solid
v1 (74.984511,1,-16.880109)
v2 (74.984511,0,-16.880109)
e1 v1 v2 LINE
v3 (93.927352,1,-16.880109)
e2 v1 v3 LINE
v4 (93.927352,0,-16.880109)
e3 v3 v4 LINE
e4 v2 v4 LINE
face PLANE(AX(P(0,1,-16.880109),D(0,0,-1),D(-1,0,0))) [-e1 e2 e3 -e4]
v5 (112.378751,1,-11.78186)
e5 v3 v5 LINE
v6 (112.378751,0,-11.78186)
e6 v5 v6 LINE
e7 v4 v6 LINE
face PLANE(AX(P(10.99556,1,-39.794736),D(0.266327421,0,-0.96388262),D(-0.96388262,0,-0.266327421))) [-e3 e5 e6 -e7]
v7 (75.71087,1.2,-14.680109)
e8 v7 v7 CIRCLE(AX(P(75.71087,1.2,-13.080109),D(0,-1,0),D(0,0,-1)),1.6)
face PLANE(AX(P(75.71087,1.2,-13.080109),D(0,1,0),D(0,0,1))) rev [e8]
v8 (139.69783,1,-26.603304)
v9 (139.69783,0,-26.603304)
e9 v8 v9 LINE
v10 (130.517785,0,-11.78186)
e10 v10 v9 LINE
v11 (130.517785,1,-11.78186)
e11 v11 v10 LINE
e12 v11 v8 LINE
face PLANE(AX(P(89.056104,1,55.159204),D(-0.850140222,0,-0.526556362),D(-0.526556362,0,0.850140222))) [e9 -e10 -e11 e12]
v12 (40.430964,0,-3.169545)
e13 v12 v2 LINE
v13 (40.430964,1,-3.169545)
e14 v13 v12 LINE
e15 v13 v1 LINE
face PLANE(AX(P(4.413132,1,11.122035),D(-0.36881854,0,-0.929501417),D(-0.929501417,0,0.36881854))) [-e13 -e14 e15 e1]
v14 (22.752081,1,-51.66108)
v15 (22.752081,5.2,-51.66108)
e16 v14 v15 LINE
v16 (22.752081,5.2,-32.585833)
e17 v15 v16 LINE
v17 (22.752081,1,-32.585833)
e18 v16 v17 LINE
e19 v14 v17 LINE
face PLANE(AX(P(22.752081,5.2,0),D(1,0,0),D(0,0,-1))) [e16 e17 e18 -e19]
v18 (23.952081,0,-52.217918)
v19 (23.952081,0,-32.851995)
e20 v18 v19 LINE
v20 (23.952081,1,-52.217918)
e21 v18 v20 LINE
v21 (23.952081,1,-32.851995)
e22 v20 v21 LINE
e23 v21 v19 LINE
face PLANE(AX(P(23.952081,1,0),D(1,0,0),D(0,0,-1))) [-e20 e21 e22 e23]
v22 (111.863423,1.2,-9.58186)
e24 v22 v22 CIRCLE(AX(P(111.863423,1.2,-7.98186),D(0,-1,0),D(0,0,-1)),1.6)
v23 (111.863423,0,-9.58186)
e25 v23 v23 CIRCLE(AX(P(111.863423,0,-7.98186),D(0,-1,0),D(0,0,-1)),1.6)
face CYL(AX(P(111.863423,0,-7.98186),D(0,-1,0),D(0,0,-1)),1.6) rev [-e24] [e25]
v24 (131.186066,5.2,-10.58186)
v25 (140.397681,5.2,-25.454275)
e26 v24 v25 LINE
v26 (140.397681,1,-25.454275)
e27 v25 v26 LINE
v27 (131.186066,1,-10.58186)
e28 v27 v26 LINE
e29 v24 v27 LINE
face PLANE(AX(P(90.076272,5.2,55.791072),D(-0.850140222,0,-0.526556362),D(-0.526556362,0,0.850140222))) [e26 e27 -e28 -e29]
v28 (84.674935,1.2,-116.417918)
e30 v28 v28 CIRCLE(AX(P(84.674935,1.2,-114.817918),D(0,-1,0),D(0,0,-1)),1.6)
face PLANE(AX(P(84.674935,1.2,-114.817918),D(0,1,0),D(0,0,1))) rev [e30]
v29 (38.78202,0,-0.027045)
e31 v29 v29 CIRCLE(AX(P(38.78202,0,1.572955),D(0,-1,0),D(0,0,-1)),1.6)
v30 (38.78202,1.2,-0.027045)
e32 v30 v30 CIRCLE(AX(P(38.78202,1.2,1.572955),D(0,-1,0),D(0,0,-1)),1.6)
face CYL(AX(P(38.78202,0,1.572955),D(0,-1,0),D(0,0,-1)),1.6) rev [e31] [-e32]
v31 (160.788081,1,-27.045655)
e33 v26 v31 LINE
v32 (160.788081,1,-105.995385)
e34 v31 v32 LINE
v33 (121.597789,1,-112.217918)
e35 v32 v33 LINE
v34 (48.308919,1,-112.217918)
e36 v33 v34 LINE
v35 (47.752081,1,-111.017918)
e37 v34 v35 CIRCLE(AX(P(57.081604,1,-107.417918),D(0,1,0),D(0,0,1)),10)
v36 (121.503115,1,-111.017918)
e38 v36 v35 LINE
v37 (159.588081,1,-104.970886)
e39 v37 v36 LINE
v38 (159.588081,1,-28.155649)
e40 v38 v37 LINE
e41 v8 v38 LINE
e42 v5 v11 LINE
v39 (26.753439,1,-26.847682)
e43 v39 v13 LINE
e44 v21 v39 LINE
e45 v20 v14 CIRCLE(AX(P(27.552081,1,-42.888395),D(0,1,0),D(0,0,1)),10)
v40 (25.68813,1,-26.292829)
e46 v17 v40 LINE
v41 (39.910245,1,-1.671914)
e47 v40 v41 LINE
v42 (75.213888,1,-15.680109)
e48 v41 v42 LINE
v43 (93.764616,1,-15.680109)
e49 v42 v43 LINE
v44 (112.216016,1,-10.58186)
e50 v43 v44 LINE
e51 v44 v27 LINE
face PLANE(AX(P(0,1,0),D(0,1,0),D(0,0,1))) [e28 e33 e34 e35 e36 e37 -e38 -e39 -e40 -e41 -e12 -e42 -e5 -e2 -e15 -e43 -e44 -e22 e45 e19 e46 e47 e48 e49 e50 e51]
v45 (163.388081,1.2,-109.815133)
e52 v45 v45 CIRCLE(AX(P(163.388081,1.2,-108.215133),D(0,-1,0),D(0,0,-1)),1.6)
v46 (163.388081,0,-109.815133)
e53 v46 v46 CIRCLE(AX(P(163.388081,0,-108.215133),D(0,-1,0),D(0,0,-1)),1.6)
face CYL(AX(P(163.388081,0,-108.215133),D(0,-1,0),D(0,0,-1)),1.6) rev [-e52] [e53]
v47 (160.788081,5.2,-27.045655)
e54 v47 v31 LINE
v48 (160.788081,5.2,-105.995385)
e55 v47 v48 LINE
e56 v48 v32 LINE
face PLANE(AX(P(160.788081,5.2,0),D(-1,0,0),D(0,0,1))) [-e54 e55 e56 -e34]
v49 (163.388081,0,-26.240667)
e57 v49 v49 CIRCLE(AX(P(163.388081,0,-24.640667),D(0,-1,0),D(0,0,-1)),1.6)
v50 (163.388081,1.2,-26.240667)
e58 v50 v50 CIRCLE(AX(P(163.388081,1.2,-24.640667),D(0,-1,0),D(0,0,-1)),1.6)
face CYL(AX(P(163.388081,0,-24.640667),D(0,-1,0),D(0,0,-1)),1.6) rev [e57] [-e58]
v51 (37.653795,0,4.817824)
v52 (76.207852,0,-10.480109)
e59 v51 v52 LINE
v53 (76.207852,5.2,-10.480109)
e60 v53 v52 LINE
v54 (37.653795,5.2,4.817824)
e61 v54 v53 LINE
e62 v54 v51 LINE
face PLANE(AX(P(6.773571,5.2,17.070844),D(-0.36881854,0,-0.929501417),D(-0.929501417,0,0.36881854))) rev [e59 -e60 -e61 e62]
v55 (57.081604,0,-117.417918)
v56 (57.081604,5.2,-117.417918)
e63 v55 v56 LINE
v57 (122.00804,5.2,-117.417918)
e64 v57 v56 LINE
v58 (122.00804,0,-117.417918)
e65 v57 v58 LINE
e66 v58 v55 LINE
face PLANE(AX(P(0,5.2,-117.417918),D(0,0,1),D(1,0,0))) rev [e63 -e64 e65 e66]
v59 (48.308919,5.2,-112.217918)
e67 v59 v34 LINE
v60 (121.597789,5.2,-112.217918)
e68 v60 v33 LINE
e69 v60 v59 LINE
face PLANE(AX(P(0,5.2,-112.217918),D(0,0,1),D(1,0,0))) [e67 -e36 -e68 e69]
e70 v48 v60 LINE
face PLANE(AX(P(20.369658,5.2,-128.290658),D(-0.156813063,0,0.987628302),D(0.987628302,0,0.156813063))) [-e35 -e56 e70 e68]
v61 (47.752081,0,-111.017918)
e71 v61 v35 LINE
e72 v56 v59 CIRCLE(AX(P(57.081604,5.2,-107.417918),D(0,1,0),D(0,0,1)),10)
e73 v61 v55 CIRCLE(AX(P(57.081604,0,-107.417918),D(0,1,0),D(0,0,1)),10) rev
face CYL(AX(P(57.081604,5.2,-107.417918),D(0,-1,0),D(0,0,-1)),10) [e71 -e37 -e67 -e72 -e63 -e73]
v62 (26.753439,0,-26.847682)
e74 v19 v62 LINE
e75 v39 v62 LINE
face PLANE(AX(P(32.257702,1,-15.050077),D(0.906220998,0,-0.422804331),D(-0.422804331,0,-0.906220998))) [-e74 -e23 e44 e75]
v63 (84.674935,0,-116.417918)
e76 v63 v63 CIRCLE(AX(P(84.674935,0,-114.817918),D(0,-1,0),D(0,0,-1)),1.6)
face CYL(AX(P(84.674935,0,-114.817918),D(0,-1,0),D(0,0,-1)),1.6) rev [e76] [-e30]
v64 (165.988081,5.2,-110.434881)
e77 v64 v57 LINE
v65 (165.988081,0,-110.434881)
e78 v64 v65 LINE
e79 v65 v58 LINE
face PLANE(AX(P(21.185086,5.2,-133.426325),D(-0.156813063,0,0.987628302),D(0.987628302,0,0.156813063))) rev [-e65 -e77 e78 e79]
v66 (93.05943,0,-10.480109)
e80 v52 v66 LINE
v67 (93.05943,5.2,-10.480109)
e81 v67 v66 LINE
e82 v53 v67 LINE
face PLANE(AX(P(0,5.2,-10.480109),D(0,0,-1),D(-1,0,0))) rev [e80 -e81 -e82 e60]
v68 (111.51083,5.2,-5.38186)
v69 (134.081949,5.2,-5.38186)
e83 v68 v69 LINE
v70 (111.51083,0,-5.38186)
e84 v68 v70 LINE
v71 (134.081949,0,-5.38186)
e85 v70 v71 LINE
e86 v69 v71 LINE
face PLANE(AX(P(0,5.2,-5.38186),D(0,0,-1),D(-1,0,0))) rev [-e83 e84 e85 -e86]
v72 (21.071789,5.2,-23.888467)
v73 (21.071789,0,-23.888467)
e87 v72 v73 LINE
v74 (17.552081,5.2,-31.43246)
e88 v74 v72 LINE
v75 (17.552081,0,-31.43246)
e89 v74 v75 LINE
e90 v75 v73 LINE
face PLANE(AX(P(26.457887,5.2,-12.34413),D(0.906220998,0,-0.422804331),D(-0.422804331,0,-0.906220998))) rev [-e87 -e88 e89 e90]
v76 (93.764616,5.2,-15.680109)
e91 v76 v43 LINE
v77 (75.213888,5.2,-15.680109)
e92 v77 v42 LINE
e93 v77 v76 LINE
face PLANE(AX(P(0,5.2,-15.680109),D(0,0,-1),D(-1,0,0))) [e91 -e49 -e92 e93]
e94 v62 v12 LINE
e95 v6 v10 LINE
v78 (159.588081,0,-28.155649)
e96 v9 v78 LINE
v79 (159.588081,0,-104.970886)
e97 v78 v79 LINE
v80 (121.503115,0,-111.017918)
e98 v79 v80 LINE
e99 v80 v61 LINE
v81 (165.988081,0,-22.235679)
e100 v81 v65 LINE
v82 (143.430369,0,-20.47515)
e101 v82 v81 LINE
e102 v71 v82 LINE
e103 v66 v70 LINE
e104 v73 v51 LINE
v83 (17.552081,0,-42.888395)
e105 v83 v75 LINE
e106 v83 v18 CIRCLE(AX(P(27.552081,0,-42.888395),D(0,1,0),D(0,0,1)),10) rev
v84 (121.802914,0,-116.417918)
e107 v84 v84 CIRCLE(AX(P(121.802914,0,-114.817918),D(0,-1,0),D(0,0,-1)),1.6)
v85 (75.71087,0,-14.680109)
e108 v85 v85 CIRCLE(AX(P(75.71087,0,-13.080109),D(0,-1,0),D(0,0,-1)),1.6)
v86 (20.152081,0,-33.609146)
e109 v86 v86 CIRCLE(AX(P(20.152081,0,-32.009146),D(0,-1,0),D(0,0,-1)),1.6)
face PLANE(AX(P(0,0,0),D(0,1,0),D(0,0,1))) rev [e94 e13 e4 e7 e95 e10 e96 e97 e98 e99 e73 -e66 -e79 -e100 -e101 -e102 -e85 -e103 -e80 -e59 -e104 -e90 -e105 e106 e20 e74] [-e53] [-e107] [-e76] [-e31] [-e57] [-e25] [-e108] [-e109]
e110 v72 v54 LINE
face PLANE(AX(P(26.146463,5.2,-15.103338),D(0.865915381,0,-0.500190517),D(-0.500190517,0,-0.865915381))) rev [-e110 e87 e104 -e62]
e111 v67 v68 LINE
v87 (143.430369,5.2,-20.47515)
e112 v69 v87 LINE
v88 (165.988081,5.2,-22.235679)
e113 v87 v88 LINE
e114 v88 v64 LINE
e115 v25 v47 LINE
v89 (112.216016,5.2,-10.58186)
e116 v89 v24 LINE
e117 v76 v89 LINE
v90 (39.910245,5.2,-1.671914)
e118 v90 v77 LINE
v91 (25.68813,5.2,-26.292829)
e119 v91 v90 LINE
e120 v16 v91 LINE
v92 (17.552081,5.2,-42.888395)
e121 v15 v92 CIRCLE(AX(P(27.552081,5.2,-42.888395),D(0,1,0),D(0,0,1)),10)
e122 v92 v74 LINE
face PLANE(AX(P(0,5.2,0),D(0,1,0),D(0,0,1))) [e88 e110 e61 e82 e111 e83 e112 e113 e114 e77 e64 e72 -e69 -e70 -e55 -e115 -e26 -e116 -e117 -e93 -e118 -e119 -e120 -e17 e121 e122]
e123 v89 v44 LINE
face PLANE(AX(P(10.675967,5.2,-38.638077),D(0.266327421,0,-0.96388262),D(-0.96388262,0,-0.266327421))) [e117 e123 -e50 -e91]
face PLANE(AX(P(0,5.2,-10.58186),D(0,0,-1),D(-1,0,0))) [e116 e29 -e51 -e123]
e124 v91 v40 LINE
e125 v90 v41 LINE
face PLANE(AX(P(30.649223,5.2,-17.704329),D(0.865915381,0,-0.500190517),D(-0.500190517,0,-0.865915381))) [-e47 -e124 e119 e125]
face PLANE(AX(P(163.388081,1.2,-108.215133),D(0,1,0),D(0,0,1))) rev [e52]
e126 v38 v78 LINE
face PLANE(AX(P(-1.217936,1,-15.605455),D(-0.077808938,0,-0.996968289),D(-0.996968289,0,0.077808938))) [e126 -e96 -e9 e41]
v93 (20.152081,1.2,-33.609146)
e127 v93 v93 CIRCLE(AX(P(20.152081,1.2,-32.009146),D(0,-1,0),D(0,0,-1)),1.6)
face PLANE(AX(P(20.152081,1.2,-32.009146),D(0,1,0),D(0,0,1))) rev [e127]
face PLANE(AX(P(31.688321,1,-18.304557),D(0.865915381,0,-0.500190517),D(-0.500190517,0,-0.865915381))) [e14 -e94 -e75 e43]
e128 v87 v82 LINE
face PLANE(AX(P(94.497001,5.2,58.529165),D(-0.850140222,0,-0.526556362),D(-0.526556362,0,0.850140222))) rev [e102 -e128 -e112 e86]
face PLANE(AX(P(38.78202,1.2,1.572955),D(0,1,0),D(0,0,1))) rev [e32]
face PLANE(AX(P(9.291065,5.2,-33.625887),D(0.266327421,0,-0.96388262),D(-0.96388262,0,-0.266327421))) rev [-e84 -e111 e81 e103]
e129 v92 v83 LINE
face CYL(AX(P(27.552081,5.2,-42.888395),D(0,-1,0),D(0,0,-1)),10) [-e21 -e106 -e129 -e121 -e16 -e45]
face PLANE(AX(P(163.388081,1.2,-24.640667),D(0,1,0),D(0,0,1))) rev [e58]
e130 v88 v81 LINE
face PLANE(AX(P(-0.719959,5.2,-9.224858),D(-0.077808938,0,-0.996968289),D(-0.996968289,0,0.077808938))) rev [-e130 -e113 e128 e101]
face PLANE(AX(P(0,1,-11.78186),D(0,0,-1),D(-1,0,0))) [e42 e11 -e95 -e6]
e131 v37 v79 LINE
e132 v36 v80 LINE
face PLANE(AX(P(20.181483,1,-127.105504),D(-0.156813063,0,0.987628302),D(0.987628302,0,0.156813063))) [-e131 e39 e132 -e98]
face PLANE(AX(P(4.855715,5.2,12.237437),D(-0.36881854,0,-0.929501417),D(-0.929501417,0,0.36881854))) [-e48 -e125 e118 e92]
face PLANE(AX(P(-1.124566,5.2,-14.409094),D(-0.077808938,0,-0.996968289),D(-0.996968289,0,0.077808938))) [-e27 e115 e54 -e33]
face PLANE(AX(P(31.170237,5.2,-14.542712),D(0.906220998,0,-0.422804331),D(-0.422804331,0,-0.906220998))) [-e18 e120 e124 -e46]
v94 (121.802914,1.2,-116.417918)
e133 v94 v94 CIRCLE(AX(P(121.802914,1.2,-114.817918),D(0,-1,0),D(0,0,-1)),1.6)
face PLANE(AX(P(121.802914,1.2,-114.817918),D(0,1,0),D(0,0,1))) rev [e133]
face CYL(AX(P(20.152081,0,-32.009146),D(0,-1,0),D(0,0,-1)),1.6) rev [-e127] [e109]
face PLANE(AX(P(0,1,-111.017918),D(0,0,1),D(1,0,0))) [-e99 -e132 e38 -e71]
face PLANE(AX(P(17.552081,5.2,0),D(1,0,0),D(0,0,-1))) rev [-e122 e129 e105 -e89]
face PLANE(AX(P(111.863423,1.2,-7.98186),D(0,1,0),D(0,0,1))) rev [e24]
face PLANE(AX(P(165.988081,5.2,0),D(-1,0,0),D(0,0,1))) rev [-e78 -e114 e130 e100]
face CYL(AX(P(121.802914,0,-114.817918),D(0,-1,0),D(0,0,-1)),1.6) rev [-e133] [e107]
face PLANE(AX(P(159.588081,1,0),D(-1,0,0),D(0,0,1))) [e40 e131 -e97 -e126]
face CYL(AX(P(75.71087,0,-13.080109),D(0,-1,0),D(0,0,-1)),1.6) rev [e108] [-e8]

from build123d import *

# Parameters (mm, degrees)
BOSS_EXTRUDE1_DEPTH       = 1
BOSS_EXTRUDE2_DEPTH       = 5.2
CUTOUT_W                  = 25
CUTOUT_H                  = 60
CUT_EXTRUDE1_DEPTH        = 204.386455918
F_3_0MM_DOWEL_HOLE2_D     = 3.2
F_3_0MM_DOWEL_HOLE2_DEPTH = 1.2
FILLET1_START             = -1
FILLET1_DEPTH             = 7
FILLET2_START             = -1
FILLET2_DEPTH             = 7


with BuildPart() as part:
    # outline → Boss-Extrude1 (new body)
    with BuildSketch(Plane(origin=(0, 0, 0), x_dir=(1, 0, 0), z_dir=(0, 1, 0))):
        Polygon((160.788080985, 105.9953847), (121.597788595, 112.217917805), (22.752080985, 112.217917805), (22.752080985, 32.585832501), (25.688129691, 26.292829341), (39.910245267, 1.671913524), (75.213887712, 15.680109343), (93.764616437, 15.680109343), (112.21601573, 10.581860359), (131.186066133, 10.581860359), (140.397681326, 25.454275085), (160.788080985, 27.045655036), align=None)
        Polygon((121.503115121, 111.017917805), (23.952080985, 111.017917805), (23.952080985, 32.851995342), (26.753439113, 26.847682296), (40.43096447, 3.169545341), (74.984511229, 16.880109343), (93.927351675, 16.880109343), (112.378750968, 11.781860359), (130.517785359, 11.781860359), (139.697830253, 26.603303939), (159.588080985, 28.155649493), (159.588080985, 104.970885583), align=None, mode=Mode.SUBTRACT)
    extrude(amount=BOSS_EXTRUDE1_DEPTH)

    # outline<9> → Boss-Extrude2 (add)
    with BuildSketch(Plane(origin=(0, 0, 0), x_dir=(1, 0, 0), z_dir=(0, 1, 0))):
        Polygon((165.988080985, 110.434880876), (122.008040315, 117.417917805), (17.552080985, 117.417917805), (17.552080985, 31.432460189), (21.071788866, 23.888466533), (37.653795388, -4.817824349), (76.207852469, 10.480109343), (93.059430407, 10.480109343), (111.510829699, 5.381860359), (134.081949487, 5.381860359), (143.430369308, 20.475150048), (165.988080985, 22.235679058), align=None)
        Polygon((121.597788595, 112.217917805), (22.752080985, 112.217917805), (22.752080985, 32.585832501), (25.688129691, 26.292829341), (39.910245267, 1.671913524), (75.213887712, 15.680109343), (93.764616437, 15.680109343), (112.21601573, 10.581860359), (131.186066133, 10.581860359), (140.397681326, 25.454275085), (160.788080985, 27.045655036), (160.788080985, 105.9953847), align=None, mode=Mode.SUBTRACT)
    extrude(amount=BOSS_EXTRUDE2_DEPTH)

    # cutout → Cut-Extrude1 (cut, through all)
    with BuildSketch(Plane(origin=(0, 0, 0), x_dir=(1, 0, 0), z_dir=(0, 1, 0))):
        with Locations((35.252080985, 82.217917805)):
            Rectangle(CUTOUT_W, CUTOUT_H)
        Polygon((17.552080985, 117.417917805), (17.552080985, 52.217917805), (22.752080985, 52.217917805), (22.752080985, 112.217917805), (47.752080985, 112.217917805), (47.752080985, 117.417917805), align=None)
    extrude(amount=CUT_EXTRUDE1_DEPTH, mode=Mode.SUBTRACT)

    # Ø3.0mm Dowel Hole2
    with Locations(Plane.XZ):
        with Locations((84.67493479, -114.817917805), (20.152080985, -32.009146345), (38.782020327, 1.572955412), (75.710870091, -13.080109343), (111.863422715, -7.981860359), (163.388080985, -24.640667047), (163.388080985, -108.215132788), (121.802914455, -114.817917805)):
            Hole(F_3_0MM_DOWEL_HOLE2_D / 2, depth=F_3_0MM_DOWEL_HOLE2_DEPTH)

    # Fillet1: read off the stored shape, not the designer's step
    # Fillet1 outline → Fillet1 (cut)
    with BuildSketch(Plane(origin=(0, 0, 0), x_dir=(1, 0, 0), z_dir=(0, 1, 0)).offset(FILLET1_START)):
        with BuildLine():
            Line((47.752080985, 117.417917805), (47.752080985, 111.017917805))
            ThreePointArc((47.752080985, 111.017917805), (51.424749768, 115.664129056), (57.081604017, 117.417917805))
            Line((57.081604017, 117.417917805), (47.752080985, 117.417917805))
        make_face()
    extrude(amount=FILLET1_DEPTH, mode=Mode.SUBTRACT)

    # Fillet2: read off the stored shape, not the designer's step
    # Fillet2 outline → Fillet2 (cut)
    with BuildSketch(Plane(origin=(0, 0, 0), x_dir=(1, 0, 0), z_dir=(0, 1, 0)).offset(FILLET2_START)):
        with BuildLine():
            Line((17.552080985, 52.217917805), (17.552080985, 42.888394773))
            ThreePointArc((17.552080985, 42.888394773), (19.305869734, 48.545249023), (23.952080985, 52.217917805))
            Line((23.952080985, 52.217917805), (17.552080985, 52.217917805))
        make_face()
    extrude(amount=FILLET2_DEPTH, mode=Mode.SUBTRACT)


solid = part.part
